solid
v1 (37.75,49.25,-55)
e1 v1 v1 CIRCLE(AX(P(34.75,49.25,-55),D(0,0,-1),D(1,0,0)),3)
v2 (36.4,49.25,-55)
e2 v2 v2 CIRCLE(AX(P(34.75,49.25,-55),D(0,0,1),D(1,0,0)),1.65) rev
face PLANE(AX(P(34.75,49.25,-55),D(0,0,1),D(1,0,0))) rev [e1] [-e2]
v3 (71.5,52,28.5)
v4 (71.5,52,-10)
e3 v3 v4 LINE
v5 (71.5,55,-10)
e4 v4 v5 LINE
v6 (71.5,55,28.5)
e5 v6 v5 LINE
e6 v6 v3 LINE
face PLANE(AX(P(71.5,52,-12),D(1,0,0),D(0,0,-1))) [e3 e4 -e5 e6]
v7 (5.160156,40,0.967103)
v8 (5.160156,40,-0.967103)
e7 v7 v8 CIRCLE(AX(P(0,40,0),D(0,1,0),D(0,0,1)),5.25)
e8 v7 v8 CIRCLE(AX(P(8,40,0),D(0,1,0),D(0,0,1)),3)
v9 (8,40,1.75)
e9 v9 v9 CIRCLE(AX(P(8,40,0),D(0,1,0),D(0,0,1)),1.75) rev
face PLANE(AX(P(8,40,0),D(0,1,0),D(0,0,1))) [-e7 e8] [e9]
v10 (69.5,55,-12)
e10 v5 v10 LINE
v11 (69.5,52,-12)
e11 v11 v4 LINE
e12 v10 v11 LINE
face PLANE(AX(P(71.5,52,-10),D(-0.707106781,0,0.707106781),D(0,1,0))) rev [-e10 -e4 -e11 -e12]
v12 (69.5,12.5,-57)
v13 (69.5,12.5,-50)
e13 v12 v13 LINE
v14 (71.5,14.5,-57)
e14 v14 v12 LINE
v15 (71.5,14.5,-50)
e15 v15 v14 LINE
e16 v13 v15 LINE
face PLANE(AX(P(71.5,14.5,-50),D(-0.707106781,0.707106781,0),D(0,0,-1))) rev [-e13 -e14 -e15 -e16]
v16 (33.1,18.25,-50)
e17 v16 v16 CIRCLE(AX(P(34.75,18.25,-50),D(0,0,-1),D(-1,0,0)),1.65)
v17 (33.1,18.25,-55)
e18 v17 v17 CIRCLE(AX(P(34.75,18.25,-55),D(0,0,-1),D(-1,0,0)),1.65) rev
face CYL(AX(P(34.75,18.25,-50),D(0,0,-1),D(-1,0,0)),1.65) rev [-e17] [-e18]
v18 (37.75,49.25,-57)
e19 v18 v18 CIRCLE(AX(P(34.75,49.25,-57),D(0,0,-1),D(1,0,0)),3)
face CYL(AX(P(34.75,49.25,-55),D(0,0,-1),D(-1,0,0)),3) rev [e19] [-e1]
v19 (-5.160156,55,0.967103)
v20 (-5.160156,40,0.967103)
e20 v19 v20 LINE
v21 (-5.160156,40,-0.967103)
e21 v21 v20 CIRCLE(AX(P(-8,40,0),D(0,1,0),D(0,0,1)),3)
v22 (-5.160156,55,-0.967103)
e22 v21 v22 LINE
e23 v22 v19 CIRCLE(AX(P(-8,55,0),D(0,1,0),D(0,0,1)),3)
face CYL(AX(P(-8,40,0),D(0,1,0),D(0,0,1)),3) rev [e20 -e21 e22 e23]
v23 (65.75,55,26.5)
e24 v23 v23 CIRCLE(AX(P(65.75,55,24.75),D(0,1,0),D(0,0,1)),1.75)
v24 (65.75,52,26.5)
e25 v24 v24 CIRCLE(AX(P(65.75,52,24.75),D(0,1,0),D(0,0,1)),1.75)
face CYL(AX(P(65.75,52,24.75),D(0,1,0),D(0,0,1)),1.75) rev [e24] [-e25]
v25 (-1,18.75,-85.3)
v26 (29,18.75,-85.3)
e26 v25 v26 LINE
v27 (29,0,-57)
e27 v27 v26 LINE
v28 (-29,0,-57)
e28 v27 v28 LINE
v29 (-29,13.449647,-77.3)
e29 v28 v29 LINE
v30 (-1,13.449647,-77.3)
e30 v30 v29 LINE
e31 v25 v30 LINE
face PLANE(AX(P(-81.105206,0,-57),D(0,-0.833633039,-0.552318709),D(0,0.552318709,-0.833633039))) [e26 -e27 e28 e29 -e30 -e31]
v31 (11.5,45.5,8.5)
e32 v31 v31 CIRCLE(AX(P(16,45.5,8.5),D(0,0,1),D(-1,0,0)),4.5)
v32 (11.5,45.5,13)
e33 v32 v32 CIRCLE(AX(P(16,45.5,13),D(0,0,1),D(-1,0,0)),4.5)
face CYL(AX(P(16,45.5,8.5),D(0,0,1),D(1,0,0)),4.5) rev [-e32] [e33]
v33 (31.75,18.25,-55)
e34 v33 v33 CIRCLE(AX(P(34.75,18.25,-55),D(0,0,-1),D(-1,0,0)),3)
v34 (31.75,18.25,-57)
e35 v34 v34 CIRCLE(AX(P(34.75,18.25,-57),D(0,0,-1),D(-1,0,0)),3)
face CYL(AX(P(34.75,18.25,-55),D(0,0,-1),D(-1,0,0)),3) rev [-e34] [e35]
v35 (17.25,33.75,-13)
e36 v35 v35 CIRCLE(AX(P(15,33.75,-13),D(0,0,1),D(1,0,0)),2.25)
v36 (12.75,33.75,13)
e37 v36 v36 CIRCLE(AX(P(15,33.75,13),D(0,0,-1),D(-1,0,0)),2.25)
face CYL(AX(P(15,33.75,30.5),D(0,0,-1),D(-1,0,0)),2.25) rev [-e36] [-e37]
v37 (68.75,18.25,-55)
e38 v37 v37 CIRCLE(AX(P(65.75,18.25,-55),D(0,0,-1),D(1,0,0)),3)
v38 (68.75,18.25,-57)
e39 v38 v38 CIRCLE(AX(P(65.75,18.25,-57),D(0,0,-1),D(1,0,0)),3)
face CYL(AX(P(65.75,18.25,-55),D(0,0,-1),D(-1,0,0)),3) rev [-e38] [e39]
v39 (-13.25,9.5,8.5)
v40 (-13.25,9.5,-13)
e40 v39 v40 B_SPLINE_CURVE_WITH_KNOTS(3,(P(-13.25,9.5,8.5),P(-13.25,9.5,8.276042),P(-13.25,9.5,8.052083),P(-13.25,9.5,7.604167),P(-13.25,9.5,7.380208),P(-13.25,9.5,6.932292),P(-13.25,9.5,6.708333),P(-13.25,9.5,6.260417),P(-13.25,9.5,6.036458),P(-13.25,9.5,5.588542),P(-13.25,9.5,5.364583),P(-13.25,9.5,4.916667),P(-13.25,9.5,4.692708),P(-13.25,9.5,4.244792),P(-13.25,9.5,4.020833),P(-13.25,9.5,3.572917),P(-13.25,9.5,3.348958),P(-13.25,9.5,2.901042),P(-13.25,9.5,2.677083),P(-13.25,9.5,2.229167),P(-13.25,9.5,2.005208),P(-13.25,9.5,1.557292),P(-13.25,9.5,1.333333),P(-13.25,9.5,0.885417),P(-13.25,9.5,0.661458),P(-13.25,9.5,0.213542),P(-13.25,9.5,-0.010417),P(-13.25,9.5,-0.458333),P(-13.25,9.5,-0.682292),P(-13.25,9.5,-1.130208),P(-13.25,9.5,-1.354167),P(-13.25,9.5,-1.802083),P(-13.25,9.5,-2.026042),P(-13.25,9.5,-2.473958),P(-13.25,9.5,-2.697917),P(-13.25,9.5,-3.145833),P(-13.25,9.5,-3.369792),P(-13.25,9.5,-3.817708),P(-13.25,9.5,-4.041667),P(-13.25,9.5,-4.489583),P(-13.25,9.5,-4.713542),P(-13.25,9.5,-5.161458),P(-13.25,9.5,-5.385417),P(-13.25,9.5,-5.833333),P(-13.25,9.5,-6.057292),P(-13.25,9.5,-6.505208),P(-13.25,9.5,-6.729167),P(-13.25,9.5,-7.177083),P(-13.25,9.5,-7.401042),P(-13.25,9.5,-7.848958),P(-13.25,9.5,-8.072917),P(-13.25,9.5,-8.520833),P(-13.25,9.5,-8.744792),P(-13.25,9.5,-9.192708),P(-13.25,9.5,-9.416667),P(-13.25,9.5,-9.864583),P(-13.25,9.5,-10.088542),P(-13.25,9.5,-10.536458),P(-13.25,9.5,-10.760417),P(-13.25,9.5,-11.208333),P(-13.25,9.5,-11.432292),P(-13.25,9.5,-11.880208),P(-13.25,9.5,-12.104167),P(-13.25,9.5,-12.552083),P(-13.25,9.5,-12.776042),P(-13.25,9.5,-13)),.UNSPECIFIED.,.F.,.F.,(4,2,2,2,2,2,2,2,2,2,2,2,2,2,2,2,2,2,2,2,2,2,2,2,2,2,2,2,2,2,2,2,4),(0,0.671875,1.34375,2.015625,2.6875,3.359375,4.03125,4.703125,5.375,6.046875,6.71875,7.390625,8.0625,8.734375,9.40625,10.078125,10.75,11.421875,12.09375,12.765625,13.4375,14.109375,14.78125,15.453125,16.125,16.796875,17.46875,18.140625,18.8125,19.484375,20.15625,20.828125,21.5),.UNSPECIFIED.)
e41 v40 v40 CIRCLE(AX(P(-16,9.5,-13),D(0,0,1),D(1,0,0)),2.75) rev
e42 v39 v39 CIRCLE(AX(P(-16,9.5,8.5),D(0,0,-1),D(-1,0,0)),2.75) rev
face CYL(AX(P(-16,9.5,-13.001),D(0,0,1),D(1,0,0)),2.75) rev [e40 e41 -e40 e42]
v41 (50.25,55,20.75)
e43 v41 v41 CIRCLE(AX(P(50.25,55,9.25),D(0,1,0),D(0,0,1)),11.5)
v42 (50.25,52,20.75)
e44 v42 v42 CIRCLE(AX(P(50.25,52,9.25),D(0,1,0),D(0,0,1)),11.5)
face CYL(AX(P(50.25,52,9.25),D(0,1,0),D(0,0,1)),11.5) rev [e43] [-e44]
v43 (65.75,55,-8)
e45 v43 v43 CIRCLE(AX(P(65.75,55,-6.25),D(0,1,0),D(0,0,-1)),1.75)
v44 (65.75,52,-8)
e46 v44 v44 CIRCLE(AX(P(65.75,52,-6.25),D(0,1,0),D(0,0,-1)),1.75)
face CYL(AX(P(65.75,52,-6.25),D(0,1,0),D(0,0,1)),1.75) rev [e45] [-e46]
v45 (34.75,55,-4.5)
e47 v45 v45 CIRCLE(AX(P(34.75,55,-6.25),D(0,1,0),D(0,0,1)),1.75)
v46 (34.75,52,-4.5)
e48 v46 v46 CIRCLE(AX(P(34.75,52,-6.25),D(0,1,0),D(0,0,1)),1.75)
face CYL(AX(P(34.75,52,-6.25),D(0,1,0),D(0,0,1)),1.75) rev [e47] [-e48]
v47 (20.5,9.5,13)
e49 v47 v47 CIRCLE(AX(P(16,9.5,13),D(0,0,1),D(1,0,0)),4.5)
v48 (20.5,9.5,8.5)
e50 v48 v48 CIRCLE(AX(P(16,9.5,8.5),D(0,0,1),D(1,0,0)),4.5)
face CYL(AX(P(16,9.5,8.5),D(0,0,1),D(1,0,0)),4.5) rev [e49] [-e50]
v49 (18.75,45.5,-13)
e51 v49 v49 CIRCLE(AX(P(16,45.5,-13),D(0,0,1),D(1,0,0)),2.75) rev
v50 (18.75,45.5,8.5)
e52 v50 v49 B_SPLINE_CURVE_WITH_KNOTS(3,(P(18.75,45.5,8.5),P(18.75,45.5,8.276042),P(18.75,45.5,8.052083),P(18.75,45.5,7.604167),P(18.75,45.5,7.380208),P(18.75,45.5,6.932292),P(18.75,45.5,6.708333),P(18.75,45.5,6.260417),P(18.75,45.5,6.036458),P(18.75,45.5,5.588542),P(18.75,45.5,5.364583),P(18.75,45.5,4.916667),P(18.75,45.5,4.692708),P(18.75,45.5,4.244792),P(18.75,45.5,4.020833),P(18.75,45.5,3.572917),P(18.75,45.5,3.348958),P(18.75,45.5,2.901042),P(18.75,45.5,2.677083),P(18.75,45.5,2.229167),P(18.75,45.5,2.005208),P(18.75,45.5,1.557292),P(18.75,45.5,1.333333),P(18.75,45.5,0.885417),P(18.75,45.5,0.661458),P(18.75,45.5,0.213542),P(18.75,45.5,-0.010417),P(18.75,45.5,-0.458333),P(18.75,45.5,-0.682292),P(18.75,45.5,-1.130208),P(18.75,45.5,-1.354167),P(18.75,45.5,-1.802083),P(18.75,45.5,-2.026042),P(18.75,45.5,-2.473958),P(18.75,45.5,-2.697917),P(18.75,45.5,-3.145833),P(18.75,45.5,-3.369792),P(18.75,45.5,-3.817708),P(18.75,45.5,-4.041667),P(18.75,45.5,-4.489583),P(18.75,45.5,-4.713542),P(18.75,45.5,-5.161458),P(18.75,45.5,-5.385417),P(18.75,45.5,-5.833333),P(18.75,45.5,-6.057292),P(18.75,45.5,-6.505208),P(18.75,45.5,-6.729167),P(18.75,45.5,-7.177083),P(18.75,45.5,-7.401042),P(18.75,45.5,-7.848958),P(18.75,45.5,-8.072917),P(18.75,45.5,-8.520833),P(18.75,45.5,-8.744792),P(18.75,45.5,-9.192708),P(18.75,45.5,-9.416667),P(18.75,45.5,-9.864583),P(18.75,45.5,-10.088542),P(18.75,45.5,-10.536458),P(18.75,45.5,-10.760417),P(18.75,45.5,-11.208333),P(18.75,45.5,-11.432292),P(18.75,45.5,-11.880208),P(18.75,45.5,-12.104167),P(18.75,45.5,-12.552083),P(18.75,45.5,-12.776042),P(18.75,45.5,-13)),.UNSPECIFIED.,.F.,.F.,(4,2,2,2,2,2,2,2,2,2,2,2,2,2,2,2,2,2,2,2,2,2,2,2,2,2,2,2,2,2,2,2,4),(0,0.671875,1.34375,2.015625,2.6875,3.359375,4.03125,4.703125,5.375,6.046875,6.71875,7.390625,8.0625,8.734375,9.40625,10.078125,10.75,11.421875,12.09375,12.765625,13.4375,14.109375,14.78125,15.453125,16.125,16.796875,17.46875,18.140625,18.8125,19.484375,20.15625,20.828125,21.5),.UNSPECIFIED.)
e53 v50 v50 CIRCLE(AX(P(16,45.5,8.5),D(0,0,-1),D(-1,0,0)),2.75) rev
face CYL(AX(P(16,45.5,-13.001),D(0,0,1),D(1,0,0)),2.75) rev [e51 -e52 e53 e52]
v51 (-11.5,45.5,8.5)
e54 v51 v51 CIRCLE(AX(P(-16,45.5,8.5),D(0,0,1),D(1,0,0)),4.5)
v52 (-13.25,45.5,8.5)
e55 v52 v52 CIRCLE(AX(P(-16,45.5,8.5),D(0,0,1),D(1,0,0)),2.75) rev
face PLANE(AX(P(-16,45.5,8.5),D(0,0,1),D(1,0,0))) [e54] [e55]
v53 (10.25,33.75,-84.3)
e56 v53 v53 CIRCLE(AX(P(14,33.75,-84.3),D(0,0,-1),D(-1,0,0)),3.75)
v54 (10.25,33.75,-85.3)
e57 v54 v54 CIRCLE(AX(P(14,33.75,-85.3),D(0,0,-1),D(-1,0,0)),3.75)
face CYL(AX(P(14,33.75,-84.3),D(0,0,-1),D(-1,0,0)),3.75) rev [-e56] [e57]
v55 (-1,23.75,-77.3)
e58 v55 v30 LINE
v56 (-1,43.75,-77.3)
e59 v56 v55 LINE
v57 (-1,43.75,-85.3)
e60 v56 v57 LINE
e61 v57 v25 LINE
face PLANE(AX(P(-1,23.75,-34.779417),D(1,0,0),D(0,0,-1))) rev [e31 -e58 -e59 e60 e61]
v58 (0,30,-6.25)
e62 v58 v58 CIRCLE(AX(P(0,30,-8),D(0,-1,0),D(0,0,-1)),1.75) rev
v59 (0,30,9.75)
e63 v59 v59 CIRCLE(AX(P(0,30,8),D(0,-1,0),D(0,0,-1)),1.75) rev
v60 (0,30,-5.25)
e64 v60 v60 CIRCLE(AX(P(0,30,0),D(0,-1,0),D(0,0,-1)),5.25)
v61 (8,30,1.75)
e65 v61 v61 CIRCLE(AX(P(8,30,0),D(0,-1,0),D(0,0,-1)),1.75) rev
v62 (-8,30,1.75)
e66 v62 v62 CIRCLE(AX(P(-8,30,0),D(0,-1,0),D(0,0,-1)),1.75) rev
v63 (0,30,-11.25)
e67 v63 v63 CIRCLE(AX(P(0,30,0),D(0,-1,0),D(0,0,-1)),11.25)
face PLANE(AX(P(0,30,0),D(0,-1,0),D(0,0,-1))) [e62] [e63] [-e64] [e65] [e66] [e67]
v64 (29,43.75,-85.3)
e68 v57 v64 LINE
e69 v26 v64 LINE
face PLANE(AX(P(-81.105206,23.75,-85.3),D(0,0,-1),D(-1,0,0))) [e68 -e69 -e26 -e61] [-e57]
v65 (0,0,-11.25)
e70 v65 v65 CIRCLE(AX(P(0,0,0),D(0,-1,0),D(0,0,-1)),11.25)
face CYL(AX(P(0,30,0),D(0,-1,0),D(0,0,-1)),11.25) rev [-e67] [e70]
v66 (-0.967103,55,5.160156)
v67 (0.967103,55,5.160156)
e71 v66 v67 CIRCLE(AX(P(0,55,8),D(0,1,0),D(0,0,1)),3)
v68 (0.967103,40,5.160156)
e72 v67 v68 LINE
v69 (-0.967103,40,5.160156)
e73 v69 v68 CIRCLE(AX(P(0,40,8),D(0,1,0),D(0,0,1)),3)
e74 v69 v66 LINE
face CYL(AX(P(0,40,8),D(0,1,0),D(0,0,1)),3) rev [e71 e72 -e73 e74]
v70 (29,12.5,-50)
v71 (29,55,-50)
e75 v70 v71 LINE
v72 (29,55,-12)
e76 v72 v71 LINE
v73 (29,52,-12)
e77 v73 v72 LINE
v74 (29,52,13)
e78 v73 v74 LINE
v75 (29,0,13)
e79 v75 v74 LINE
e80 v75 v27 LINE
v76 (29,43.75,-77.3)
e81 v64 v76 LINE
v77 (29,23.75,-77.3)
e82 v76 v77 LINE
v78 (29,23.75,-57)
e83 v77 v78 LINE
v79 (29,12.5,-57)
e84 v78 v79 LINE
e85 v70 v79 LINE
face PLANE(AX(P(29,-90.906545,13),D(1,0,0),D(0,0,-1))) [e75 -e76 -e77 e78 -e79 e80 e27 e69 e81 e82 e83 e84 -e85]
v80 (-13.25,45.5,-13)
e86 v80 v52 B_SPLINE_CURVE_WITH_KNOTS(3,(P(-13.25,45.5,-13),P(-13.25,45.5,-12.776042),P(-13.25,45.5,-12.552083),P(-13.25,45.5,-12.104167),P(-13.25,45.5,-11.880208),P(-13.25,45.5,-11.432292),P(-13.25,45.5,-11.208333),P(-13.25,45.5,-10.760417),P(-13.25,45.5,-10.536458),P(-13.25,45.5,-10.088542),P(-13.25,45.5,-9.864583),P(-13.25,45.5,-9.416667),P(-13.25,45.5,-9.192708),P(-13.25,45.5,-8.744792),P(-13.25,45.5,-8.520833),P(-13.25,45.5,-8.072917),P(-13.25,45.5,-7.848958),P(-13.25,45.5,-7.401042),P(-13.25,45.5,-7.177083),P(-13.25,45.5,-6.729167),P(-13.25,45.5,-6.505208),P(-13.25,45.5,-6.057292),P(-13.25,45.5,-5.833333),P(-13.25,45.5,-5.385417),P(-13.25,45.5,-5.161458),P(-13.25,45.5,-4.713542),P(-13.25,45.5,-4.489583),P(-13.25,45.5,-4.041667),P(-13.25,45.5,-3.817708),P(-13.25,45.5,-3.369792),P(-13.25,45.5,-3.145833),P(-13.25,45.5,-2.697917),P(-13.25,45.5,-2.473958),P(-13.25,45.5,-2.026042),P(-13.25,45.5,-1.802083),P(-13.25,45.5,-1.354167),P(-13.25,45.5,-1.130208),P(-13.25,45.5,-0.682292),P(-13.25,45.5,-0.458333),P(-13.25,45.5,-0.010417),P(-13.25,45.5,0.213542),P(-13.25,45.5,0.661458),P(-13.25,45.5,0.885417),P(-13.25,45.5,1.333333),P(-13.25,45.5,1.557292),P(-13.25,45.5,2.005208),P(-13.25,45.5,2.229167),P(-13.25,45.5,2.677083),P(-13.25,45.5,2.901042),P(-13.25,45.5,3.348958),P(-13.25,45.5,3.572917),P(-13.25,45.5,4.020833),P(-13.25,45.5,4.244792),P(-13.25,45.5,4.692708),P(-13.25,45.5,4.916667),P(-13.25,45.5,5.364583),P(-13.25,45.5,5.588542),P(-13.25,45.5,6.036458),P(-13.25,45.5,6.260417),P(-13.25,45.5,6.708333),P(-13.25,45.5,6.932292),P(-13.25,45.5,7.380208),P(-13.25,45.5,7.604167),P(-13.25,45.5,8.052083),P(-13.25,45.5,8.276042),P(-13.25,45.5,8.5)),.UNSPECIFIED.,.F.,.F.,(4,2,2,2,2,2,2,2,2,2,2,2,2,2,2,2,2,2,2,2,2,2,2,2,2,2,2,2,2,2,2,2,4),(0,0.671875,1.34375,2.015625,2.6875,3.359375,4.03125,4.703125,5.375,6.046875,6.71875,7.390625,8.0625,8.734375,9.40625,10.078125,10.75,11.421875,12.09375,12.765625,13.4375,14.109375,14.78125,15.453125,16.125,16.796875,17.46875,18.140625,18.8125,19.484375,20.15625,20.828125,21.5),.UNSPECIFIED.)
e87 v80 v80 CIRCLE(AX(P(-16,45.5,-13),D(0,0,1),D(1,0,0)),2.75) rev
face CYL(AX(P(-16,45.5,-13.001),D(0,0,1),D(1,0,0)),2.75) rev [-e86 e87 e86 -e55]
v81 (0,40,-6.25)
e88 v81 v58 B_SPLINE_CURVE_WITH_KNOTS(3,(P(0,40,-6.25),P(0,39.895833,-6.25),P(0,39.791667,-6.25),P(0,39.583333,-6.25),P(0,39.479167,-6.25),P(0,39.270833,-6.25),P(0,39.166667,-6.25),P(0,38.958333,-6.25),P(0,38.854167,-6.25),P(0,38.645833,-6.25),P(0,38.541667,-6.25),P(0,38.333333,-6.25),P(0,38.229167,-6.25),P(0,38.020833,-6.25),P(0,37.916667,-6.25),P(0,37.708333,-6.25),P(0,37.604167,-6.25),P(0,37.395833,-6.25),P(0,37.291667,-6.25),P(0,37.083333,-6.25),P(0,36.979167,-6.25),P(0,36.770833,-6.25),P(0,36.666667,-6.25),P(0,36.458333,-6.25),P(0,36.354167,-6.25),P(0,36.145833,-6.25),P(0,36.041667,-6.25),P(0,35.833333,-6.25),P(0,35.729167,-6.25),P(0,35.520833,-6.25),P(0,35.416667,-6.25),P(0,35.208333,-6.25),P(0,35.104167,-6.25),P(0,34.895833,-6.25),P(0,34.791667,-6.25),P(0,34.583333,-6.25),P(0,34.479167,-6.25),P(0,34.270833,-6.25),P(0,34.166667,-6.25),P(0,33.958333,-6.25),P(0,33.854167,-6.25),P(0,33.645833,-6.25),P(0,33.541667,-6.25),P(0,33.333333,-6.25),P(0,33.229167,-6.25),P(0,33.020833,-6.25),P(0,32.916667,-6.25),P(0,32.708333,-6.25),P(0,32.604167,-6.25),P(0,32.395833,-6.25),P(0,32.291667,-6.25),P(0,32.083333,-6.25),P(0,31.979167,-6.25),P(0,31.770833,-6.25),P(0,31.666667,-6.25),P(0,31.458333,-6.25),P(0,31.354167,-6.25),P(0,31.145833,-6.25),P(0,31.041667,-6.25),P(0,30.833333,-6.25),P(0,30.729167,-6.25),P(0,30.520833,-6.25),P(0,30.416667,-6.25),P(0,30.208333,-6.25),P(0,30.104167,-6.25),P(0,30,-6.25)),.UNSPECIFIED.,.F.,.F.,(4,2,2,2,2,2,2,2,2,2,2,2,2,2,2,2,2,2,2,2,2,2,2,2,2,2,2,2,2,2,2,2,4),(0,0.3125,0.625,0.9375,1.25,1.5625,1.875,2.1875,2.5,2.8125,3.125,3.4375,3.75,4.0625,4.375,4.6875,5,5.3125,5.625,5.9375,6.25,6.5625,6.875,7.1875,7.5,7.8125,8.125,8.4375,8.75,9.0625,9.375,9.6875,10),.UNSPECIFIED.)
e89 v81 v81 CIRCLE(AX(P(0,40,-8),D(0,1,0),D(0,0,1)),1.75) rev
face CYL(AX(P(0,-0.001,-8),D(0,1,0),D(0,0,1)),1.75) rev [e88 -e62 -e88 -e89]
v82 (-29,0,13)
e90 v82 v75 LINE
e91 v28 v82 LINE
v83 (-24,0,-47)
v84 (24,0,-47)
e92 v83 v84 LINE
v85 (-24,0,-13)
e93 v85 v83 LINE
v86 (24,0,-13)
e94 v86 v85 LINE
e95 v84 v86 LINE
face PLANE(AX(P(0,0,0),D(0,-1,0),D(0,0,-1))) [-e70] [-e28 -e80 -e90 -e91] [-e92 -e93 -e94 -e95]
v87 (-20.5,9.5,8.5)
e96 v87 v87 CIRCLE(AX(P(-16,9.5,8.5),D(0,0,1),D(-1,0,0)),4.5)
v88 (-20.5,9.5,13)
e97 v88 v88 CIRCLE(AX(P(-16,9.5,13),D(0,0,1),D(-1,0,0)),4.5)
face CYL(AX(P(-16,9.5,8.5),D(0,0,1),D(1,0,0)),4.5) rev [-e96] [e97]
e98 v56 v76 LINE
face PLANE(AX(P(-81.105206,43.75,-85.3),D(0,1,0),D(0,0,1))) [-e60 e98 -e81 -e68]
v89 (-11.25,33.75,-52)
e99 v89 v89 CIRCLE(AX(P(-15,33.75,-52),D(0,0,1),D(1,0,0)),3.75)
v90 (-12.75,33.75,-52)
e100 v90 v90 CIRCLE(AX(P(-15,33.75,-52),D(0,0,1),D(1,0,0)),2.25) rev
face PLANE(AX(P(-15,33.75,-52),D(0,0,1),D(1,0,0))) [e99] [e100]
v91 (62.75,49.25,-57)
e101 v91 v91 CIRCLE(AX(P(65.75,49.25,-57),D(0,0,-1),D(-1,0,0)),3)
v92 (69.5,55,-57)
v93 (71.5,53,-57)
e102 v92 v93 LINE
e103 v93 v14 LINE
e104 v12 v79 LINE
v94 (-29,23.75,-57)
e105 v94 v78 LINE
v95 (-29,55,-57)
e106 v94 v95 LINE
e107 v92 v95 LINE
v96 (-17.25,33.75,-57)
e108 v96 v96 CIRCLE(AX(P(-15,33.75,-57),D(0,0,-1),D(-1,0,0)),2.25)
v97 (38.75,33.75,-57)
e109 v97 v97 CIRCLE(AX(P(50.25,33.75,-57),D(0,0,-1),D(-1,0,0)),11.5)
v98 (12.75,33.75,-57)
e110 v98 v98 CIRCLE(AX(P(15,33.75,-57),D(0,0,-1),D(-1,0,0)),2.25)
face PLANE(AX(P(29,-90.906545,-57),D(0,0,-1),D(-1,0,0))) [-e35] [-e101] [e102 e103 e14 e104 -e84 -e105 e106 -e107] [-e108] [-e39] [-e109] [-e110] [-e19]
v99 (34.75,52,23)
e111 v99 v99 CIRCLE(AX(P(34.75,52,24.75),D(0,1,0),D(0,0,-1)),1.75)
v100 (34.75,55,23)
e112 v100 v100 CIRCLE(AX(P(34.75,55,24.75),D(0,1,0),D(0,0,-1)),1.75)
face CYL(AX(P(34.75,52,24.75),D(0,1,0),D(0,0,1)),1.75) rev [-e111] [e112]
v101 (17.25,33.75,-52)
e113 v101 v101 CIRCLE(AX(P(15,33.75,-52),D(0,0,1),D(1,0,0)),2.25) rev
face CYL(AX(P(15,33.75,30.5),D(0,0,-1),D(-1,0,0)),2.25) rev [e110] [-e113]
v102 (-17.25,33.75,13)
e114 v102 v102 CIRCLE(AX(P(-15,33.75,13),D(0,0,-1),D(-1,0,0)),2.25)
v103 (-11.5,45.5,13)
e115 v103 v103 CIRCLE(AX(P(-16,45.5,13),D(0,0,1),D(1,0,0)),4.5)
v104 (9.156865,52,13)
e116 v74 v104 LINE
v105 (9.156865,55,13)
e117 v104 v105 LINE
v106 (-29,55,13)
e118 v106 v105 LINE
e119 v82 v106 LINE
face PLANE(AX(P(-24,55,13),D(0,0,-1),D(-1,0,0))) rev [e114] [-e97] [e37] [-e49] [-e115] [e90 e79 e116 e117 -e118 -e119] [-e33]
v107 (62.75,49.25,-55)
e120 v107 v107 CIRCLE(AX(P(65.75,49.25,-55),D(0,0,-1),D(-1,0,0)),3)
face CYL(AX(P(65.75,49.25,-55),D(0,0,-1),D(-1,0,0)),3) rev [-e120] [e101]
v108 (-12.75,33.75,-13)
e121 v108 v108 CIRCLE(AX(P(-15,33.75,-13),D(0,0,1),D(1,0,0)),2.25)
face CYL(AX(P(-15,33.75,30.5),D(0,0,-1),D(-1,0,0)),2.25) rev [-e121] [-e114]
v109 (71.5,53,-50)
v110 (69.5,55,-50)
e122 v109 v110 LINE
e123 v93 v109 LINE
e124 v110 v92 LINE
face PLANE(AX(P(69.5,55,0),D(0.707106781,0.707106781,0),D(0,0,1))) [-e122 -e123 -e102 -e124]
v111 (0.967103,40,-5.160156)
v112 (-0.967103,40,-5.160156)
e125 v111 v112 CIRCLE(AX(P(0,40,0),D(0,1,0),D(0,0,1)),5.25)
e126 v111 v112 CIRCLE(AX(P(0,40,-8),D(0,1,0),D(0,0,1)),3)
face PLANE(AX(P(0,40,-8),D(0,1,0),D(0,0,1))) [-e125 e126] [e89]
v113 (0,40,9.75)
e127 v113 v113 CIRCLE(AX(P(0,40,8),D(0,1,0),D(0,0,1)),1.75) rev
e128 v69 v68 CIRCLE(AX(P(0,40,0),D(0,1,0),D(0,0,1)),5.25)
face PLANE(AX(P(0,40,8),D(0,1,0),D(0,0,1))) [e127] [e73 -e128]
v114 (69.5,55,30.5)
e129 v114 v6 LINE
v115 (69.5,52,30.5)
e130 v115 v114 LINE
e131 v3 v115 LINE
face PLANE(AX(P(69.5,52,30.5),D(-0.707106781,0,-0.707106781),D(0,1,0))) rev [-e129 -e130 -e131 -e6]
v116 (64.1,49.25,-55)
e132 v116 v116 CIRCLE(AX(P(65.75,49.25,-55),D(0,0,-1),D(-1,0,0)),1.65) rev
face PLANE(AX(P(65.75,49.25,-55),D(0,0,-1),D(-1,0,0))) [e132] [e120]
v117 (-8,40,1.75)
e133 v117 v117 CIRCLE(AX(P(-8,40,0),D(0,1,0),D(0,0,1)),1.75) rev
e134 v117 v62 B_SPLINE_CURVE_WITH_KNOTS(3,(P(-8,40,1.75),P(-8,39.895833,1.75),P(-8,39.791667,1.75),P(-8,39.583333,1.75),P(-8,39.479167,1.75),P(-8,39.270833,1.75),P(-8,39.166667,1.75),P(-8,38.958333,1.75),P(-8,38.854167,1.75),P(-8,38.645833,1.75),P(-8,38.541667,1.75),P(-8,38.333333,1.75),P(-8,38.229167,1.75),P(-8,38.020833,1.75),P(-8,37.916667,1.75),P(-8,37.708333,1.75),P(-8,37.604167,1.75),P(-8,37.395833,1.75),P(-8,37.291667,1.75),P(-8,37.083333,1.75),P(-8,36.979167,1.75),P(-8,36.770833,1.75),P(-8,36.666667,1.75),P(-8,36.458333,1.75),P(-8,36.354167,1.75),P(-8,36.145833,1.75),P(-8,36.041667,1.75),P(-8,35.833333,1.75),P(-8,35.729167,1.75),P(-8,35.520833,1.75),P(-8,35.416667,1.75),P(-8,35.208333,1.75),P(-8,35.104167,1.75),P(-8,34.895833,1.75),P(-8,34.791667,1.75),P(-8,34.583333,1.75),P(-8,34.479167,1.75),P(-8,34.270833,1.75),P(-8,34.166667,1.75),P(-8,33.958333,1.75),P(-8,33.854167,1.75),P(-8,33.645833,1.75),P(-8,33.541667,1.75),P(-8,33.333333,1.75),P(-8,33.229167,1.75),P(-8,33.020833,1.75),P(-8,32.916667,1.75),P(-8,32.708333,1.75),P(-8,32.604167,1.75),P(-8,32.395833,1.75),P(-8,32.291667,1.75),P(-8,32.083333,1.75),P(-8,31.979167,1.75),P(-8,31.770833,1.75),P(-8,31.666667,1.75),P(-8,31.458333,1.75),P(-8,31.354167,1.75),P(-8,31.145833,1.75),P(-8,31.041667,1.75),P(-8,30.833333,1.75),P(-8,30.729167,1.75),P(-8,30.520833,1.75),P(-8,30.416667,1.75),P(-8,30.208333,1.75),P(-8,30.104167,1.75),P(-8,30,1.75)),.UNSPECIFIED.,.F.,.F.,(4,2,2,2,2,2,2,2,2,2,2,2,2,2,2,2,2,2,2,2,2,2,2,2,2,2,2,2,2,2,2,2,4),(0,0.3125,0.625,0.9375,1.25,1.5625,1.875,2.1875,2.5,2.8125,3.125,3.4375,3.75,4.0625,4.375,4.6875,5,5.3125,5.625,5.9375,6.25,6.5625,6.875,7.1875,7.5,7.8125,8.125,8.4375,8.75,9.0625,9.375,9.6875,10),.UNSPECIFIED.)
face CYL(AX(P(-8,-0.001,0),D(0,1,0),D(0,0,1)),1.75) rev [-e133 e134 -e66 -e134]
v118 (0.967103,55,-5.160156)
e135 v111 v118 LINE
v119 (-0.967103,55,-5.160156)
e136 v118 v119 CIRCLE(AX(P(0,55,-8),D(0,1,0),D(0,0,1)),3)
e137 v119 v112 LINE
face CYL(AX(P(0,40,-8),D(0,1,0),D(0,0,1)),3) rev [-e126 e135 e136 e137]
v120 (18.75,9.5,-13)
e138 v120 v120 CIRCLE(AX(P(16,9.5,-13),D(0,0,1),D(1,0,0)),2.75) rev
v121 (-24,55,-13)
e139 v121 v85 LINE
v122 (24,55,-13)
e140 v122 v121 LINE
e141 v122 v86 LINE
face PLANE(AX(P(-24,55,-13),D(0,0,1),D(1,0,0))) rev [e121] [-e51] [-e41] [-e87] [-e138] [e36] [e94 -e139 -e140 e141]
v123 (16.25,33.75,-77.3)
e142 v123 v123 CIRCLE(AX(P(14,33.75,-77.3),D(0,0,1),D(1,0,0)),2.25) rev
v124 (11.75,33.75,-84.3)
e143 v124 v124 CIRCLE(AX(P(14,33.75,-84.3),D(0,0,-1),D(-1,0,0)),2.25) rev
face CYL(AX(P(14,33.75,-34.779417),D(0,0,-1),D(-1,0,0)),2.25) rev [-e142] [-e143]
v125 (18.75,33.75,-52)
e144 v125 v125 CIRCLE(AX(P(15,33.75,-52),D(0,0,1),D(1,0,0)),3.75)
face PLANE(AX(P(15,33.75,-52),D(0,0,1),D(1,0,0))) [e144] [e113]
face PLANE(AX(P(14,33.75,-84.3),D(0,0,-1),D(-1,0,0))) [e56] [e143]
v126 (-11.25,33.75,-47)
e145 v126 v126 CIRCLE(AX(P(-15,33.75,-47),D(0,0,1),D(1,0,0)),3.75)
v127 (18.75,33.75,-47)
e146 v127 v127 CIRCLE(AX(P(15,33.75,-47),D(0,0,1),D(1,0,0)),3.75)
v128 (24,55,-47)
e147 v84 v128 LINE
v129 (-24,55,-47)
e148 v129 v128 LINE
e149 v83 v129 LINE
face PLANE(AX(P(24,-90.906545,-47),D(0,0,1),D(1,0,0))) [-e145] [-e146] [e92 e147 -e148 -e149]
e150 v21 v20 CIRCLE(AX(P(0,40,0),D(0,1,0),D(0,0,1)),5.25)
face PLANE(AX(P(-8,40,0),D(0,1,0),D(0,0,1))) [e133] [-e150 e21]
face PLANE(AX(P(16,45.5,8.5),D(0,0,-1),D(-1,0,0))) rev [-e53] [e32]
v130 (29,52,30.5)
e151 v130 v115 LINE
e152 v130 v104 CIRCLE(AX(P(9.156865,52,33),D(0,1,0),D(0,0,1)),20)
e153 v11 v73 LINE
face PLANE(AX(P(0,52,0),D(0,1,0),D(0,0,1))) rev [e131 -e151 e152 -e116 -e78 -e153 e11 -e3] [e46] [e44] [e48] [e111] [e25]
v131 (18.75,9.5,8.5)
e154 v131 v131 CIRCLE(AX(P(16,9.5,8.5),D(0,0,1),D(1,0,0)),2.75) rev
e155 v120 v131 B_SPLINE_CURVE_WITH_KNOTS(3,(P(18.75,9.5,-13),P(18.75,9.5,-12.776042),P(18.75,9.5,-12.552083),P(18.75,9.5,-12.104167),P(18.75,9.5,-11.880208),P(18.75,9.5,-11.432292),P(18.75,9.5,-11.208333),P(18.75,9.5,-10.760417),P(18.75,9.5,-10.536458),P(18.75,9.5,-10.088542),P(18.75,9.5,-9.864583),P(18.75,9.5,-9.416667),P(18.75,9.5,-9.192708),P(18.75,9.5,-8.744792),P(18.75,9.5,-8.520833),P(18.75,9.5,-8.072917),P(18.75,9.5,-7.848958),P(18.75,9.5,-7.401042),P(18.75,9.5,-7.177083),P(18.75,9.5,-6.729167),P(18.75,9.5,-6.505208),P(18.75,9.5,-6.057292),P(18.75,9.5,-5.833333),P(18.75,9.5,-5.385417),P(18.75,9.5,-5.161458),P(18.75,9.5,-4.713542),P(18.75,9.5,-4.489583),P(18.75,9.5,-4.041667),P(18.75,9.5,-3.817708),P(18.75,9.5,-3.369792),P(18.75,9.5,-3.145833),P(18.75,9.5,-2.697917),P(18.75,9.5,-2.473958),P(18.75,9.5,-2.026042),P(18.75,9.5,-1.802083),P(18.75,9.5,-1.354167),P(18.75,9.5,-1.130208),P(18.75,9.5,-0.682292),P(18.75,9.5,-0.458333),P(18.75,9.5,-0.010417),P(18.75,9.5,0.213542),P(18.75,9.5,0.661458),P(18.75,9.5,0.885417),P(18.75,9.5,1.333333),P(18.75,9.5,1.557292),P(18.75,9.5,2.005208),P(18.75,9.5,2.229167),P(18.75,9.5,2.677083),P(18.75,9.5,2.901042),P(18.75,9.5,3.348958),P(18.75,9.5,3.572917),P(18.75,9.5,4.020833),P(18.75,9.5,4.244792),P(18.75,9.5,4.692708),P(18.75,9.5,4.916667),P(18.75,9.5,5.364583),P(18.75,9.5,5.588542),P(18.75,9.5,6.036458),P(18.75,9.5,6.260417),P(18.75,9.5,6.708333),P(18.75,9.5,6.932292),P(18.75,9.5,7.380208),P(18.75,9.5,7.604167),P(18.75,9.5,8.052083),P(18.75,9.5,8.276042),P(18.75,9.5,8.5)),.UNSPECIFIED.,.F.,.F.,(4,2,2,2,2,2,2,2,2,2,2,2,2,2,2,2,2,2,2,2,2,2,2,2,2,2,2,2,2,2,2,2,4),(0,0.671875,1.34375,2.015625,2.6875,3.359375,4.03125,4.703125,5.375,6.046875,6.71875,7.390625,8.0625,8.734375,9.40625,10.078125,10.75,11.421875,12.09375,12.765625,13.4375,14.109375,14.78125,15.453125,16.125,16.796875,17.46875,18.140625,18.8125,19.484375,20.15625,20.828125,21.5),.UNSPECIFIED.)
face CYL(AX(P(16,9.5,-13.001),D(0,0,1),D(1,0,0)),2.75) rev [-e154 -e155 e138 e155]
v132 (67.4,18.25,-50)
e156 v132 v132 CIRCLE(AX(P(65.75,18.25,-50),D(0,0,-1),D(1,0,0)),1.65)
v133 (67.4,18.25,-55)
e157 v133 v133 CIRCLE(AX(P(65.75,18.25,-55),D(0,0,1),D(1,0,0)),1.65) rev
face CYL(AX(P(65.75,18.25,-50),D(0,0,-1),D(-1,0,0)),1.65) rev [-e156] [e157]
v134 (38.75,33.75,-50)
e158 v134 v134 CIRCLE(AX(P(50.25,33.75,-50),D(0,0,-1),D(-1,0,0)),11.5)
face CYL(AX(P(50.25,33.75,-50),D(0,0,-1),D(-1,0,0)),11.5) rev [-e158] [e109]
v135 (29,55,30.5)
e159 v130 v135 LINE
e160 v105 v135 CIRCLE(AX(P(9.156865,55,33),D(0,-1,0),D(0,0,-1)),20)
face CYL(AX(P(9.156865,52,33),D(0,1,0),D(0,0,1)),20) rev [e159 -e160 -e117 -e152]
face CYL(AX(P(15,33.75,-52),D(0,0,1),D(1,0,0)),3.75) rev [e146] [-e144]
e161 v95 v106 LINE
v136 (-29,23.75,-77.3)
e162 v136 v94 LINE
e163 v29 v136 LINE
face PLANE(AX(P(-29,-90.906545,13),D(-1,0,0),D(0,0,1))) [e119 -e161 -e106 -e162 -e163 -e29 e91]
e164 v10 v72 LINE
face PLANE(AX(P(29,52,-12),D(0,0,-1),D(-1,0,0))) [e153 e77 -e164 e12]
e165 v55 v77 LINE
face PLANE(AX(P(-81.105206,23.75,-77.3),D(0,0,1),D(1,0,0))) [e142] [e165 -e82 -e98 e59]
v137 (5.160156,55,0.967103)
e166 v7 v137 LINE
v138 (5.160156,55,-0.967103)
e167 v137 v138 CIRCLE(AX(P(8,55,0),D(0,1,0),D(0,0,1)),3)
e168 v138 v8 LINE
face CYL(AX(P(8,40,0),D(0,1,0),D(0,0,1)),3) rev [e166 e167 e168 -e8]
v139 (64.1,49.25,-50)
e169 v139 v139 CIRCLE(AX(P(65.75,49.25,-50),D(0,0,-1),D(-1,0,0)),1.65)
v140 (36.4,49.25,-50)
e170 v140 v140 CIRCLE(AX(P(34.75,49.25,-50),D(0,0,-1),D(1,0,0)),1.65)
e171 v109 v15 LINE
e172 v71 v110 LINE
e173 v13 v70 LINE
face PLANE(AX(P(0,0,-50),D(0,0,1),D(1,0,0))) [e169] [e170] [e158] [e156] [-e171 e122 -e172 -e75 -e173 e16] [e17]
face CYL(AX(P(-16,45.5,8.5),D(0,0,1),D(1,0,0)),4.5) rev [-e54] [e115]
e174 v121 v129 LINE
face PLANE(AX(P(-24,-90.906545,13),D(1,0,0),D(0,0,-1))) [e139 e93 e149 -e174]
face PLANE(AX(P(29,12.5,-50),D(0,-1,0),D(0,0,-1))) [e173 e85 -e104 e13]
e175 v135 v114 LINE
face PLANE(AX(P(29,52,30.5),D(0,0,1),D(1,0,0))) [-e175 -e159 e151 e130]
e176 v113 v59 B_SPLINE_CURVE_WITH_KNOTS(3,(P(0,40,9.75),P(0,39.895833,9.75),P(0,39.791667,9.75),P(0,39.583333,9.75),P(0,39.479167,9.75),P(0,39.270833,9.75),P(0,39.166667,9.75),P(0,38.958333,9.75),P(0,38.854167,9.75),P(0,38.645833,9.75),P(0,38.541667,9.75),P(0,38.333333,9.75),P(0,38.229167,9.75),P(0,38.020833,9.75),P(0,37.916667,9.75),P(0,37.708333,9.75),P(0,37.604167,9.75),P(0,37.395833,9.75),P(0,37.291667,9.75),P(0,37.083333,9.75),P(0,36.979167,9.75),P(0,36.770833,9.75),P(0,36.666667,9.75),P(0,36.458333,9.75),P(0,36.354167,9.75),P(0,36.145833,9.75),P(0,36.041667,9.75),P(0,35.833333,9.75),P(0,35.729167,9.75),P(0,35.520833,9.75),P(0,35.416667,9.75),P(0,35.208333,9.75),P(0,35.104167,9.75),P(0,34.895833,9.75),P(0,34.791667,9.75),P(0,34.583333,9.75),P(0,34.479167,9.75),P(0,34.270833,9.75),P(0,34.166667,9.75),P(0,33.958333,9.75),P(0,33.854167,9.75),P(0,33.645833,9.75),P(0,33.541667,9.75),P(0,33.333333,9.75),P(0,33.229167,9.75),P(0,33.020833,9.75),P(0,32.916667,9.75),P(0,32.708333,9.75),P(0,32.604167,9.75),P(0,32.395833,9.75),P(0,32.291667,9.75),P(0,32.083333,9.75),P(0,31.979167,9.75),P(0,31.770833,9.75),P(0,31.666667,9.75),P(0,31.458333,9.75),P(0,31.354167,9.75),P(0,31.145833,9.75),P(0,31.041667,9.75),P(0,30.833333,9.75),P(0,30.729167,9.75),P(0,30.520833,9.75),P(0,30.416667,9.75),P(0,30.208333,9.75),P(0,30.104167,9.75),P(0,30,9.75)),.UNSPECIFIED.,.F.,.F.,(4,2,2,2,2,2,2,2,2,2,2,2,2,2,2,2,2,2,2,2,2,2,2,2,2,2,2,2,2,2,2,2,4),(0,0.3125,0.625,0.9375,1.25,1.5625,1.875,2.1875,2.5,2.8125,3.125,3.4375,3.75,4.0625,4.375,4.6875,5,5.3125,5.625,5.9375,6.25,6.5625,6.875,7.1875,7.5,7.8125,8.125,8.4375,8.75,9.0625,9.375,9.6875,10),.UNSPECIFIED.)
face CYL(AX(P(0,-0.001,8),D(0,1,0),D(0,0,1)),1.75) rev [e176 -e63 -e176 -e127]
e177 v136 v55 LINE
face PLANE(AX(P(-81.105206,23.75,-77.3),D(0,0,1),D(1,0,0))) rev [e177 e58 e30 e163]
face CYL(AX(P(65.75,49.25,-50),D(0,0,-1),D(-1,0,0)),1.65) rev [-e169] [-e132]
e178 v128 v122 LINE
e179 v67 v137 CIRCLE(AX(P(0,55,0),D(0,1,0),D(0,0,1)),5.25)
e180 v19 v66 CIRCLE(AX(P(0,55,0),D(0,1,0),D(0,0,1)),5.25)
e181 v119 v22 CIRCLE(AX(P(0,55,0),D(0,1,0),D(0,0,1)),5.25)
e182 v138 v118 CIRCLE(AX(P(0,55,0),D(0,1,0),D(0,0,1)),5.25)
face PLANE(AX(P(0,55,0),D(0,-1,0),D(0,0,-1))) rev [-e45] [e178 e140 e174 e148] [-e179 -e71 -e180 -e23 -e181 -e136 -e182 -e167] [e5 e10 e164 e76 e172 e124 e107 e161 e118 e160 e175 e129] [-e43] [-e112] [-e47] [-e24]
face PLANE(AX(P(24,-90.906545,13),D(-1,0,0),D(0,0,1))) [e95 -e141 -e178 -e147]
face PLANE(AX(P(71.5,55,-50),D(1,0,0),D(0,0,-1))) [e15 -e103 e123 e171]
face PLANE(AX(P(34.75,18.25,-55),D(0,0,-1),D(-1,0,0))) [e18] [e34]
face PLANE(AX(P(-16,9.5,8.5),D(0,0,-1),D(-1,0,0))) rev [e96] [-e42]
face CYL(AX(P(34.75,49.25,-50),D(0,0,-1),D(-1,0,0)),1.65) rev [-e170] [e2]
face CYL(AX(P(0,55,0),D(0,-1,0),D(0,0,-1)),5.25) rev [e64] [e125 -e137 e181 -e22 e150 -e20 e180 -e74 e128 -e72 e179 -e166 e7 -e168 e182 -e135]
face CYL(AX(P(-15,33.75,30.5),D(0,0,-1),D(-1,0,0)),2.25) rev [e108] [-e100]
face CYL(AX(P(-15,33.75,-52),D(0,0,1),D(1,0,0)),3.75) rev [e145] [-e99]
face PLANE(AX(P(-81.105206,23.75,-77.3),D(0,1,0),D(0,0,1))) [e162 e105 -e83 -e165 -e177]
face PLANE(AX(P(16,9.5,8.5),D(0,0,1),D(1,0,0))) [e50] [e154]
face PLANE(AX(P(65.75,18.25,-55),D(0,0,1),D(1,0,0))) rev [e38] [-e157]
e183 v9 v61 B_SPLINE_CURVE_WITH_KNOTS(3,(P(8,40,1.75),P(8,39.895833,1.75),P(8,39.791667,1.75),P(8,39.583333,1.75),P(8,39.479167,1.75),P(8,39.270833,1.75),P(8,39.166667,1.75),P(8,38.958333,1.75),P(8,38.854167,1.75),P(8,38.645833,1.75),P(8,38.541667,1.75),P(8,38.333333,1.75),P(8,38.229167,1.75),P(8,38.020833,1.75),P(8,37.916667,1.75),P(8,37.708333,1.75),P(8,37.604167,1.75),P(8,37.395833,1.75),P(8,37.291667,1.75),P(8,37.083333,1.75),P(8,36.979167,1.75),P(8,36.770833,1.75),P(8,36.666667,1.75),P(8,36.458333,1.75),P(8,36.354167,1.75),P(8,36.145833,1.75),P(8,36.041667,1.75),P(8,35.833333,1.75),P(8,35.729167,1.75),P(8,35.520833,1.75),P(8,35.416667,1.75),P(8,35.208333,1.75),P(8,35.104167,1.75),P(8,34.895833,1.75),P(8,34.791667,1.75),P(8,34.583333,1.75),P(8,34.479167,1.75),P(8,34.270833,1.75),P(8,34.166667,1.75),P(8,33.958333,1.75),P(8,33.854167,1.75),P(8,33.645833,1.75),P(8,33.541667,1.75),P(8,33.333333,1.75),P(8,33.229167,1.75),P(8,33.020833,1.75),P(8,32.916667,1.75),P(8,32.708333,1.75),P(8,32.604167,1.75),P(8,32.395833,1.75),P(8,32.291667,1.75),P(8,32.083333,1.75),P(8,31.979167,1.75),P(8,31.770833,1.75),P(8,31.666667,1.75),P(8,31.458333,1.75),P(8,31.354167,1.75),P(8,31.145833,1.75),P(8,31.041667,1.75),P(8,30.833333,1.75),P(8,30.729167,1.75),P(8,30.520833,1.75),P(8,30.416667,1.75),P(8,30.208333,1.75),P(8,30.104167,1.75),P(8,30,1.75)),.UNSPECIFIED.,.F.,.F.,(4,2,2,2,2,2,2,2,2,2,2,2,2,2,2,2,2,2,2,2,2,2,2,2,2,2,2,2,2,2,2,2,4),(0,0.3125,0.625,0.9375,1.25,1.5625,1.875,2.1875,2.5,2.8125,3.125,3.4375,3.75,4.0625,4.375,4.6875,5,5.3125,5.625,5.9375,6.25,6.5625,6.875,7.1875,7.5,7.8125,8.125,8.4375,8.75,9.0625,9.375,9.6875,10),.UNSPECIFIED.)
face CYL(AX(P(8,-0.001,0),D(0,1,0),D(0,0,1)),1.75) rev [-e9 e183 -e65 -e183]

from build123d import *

# Parameters (mm, degrees)
SKETCH1_W           = 48
SKETCH1_H           = 26
SKETCH1_R           = 5.25
BOSS_EXTRUDE1_DEPTH = 55
CUT_EXTRUDE1_REACH  = 67.399
SKETCH2_R           = 2.75
SKETCH3_R           = 4.5
CUT_EXTRUDE2_DEPTH  = 4.5
CUT_EXTRUDE3_REACH  = 63.4
SKETCH4_R           = 1.75
SKETCH5_R           = 3
CUT_EXTRUDE4_DEPTH  = 15
SKETCH6_R           = 11.25
CUT_EXTRUDE5_DEPTH  = 30
BOSS_EXTRUDE3_DEPTH = 55
SKETCH10_W          = 42.5
SKETCH10_H          = 42.5
SKETCH10_R          = 1.65
SKETCH10_R_2        = 11.5
BOSS_EXTRUDE4_DEPTH = 7
CHAMFER1_SIZE       = 2
SKETCH11_W          = 42.5
SKETCH11_H          = 42.5
SKETCH11_R          = 11.5
SKETCH11_R_2        = 1.75
BOSS_EXTRUDE5_DEPTH = 3
FILLET2_R           = 20
CHAMFER2_SIZE       = 2
BOSS_EXTRUDE6_DEPTH = 58
SKETCH13_R          = 2.25
CUT_EXTRUDE6_DEPTH  = 126.672192628
SKETCH14_R          = 3.75
CUT_EXTRUDE7_DEPTH  = 5
SKETCH15_R          = 2.25
CUT_EXTRUDE8_DEPTH  = 8
SKETCH16_R          = 3.75
CUT_EXTRUDE9_DEPTH  = 1
SKETCH17_R          = 3
CUT_EXTRUDE10_DEPTH = 2


with BuildPart() as part:
    # Sketch1 → Boss-Extrude1 (new body)
    with BuildSketch(Plane(origin=(0, 0, 0), x_dir=(1, 0, 0), z_dir=(0, 1, 0))):
        Rectangle(SKETCH1_W, SKETCH1_H)
        with Locations(Location((0, 0, 0), (0, 0, 270))):
            Circle(SKETCH1_R, mode=Mode.SUBTRACT)
    extrude(amount=BOSS_EXTRUDE1_DEPTH)

    # Sketch2 → Cut-Extrude1 (cut, up to next)
    with BuildSketch(Plane.XY.offset(13), mode=Mode.PRIVATE) as cut_extrude1_sk1:
        with Locations((-16, 45.5)):
            Circle(SKETCH2_R)
    cut_extrude1_tool1 = extrude(cut_extrude1_sk1.sketch, amount=-CUT_EXTRUDE1_REACH, mode=Mode.PRIVATE) & part.part
    # Sketch2 → Cut-Extrude1 (cut, up to next)
    with BuildSketch(Plane.XY.offset(13), mode=Mode.PRIVATE) as cut_extrude1_sk2:
        with Locations((16, 45.5)):
            Circle(SKETCH2_R)
    cut_extrude1_tool2 = extrude(cut_extrude1_sk2.sketch, amount=-CUT_EXTRUDE1_REACH, mode=Mode.PRIVATE) & part.part
    # Sketch2 → Cut-Extrude1 (cut, up to next)
    with BuildSketch(Plane.XY.offset(13), mode=Mode.PRIVATE) as cut_extrude1_sk3:
        with Locations((16, 9.5)):
            Circle(SKETCH2_R)
    cut_extrude1_tool3 = extrude(cut_extrude1_sk3.sketch, amount=-CUT_EXTRUDE1_REACH, mode=Mode.PRIVATE) & part.part
    # Sketch2 → Cut-Extrude1 (cut, up to next)
    with BuildSketch(Plane.XY.offset(13), mode=Mode.PRIVATE) as cut_extrude1_sk4:
        with Locations((-16, 9.5)):
            Circle(SKETCH2_R)
    cut_extrude1_tool4 = extrude(cut_extrude1_sk4.sketch, amount=-CUT_EXTRUDE1_REACH, mode=Mode.PRIVATE) & part.part
    add(cut_extrude1_tool1.solids().sort_by_distance((-16, 45.5, 13))[0], mode=Mode.SUBTRACT)
    add(cut_extrude1_tool2.solids().sort_by_distance((16, 45.5, 13))[0], mode=Mode.SUBTRACT)
    add(cut_extrude1_tool3.solids().sort_by_distance((16, 9.5, 13))[0], mode=Mode.SUBTRACT)
    add(cut_extrude1_tool4.solids().sort_by_distance((-16, 9.5, 13))[0], mode=Mode.SUBTRACT)

    # Sketch3 → Cut-Extrude2 (cut)
    with BuildSketch(Plane.XY.offset(13)):
        with Locations((-16, 45.5)):
            Circle(SKETCH3_R)
        with Locations(Location((16, 45.5, 0), (0, 0, 180))):
            Circle(SKETCH3_R)
        with Locations((16, 9.5)):
            Circle(SKETCH3_R)
        with Locations(Location((-16, 9.5, 0), (0, 0, 180))):
            Circle(SKETCH3_R)
    extrude(amount=-CUT_EXTRUDE2_DEPTH, mode=Mode.SUBTRACT)

    # Sketch4 → Cut-Extrude3 (cut, up to next)
    with BuildSketch(Plane(origin=(0, 55, 0), x_dir=(1, 0, 0), z_dir=(0, 1, 0)), mode=Mode.PRIVATE) as cut_extrude3_sk1:
        with Locations(Location((0, 8, 0), (0, 0, 270))):
            Circle(SKETCH4_R)
    cut_extrude3_tool1 = extrude(cut_extrude3_sk1.sketch, amount=-CUT_EXTRUDE3_REACH, mode=Mode.PRIVATE) & part.part
    # Sketch4 → Cut-Extrude3 (cut, up to next)
    with BuildSketch(Plane(origin=(0, 55, 0), x_dir=(1, 0, 0), z_dir=(0, 1, 0)), mode=Mode.PRIVATE) as cut_extrude3_sk2:
        with Locations(Location((8, 0, 0), (0, 0, 270))):
            Circle(SKETCH4_R)
    cut_extrude3_tool2 = extrude(cut_extrude3_sk2.sketch, amount=-CUT_EXTRUDE3_REACH, mode=Mode.PRIVATE) & part.part
    # Sketch4 → Cut-Extrude3 (cut, up to next)
    with BuildSketch(Plane(origin=(0, 55, 0), x_dir=(1, 0, 0), z_dir=(0, 1, 0)), mode=Mode.PRIVATE) as cut_extrude3_sk3:
        with Locations(Location((0, -8, 0), (0, 0, 270))):
            Circle(SKETCH4_R)
    cut_extrude3_tool3 = extrude(cut_extrude3_sk3.sketch, amount=-CUT_EXTRUDE3_REACH, mode=Mode.PRIVATE) & part.part
    # Sketch4 → Cut-Extrude3 (cut, up to next)
    with BuildSketch(Plane(origin=(0, 55, 0), x_dir=(1, 0, 0), z_dir=(0, 1, 0)), mode=Mode.PRIVATE) as cut_extrude3_sk4:
        with Locations(Location((-8, 0, 0), (0, 0, 270))):
            Circle(SKETCH4_R)
    cut_extrude3_tool4 = extrude(cut_extrude3_sk4.sketch, amount=-CUT_EXTRUDE3_REACH, mode=Mode.PRIVATE) & part.part
    add(cut_extrude3_tool1.solids().sort_by_distance((0, 55, -8))[0], mode=Mode.SUBTRACT)
    add(cut_extrude3_tool2.solids().sort_by_distance((8, 55, 0))[0], mode=Mode.SUBTRACT)
    add(cut_extrude3_tool3.solids().sort_by_distance((0, 55, 8))[0], mode=Mode.SUBTRACT)
    add(cut_extrude3_tool4.solids().sort_by_distance((-8, 55, 0))[0], mode=Mode.SUBTRACT)

    # Sketch5 → Cut-Extrude4 (cut)
    with BuildSketch(Plane(origin=(0, 55, 0), x_dir=(1, 0, 0), z_dir=(0, 1, 0))):
        with Locations((0, 8)):
            Circle(SKETCH5_R)
        with Locations((8, 0)):
            Circle(SKETCH5_R)
        with Locations((0, -8)):
            Circle(SKETCH5_R)
        with Locations((-8, 0)):
            Circle(SKETCH5_R)
    extrude(amount=-CUT_EXTRUDE4_DEPTH, mode=Mode.SUBTRACT)

    # Sketch6 → Cut-Extrude5 (cut)
    with BuildSketch(Plane.XZ):
        with Locations(Location((0, 0, 0), (0, 0, 270))):
            Circle(SKETCH6_R)
    extrude(amount=-CUT_EXTRUDE5_DEPTH, mode=Mode.SUBTRACT)

    # Sketch9 → Boss-Extrude3 (add)
    with BuildSketch(Plane(origin=(0, 55, 0), x_dir=(1, 0, 0), z_dir=(0, 1, 0))):
        Polygon((-24, -13), (-29, -13), (-29, 57), (29, 57), (29, -13), (24, -13), (24, 47), (-24, 47), align=None)
    extrude(amount=-BOSS_EXTRUDE3_DEPTH)

    # Sketch10 → Boss-Extrude4 (add)
    with BuildSketch(Plane(origin=(0, 0, -57), x_dir=(-1, 0, 0), z_dir=(0, 0, -1))):
        with Locations((-50.25, 33.75)):
            Rectangle(SKETCH10_W, SKETCH10_H)
        with Locations((-65.75, 49.25)):
            Circle(SKETCH10_R, mode=Mode.SUBTRACT)
        with Locations(Location((-34.75, 49.25, 0), (0, 0, 180))):
            Circle(SKETCH10_R, mode=Mode.SUBTRACT)
        with Locations((-34.75, 18.25)):
            Circle(SKETCH10_R, mode=Mode.SUBTRACT)
        with Locations(Location((-65.75, 18.25, 0), (0, 0, 180))):
            Circle(SKETCH10_R, mode=Mode.SUBTRACT)
        with Locations((-50.25, 33.75)):
            Circle(SKETCH10_R_2, mode=Mode.SUBTRACT)
    extrude(amount=-BOSS_EXTRUDE4_DEPTH)

    # Chamfer1
    chamfer1_edges = [part.edges().sort_by_distance(p)[0] for p in [
        (71.5, 12.5, -53.5),
        (71.5, 55, -53.5),
    ]]
    chamfer(chamfer1_edges, length=CHAMFER1_SIZE)

    # Sketch11 → Boss-Extrude5 (add)
    with BuildSketch(Plane(origin=(0, 55, 0), x_dir=(1, 0, 0), z_dir=(0, 1, 0))):
        with Locations((50.25, -9.25)):
            Rectangle(SKETCH11_W, SKETCH11_H)
        with Locations(Location((50.25, -9.25, 0), (0, 0, 270))):
            Circle(SKETCH11_R, mode=Mode.SUBTRACT)
        with Locations(Location((34.75, 6.25, 0), (0, 0, 270))):
            Circle(SKETCH11_R_2, mode=Mode.SUBTRACT)
        with Locations(Location((65.75, 6.25, 0), (0, 0, 90))):
            Circle(SKETCH11_R_2, mode=Mode.SUBTRACT)
        with Locations(Location((65.75, -24.75, 0), (0, 0, 270))):
            Circle(SKETCH11_R_2, mode=Mode.SUBTRACT)
        with Locations(Location((34.75, -24.75, 0), (0, 0, 90))):
            Circle(SKETCH11_R_2, mode=Mode.SUBTRACT)
    extrude(amount=-BOSS_EXTRUDE5_DEPTH)

    # Fillet2
    # the kernel refuses this fillet: 20 mm, written as the material it adds along each edge
    with BuildSketch(Plane(origin=(29, 55, 13), x_dir=(-1, 0, 0), z_dir=(0, -1, 0))) as fillet2_piece_1:
        with BuildLine():
            CenterArc((19.843134833, -20), FILLET2_R, 90, 82.819244219)
            Line((0, -17.5), (0, 0))
            Line((0, 0), (19.843134833, 0))
        make_face()
    extrude(amount=3)

    # Chamfer2
    chamfer2_edges = [part.edges().sort_by_distance(p)[0] for p in [
        (71.5, 53.5, -12),
        (71.5, 53.5, 30.5),
    ]]
    chamfer(chamfer2_edges, length=CHAMFER2_SIZE)

    # Sketch12 → Boss-Extrude6 (add)
    with BuildSketch(Plane(origin=(29, 0, 0), x_dir=(0, 0, -1), z_dir=(1, 0, 0))):
        Polygon((57, 0), (85.3, 18.75), (85.3, 23.75), (85.3, 43.75), (77.3, 43.75), (77.3, 23.75), (57, 23.75), align=None)
    extrude(amount=-BOSS_EXTRUDE6_DEPTH)

    # Sketch13 → Cut-Extrude6 (cut, through all)
    with BuildSketch(Plane(origin=(0, 0, -57), x_dir=(-1, 0, 0), z_dir=(0, 0, -1))):
        with Locations((15, 33.75)):
            Circle(SKETCH13_R)
        with Locations((-15, 33.75)):
            Circle(SKETCH13_R)
    extrude(amount=-CUT_EXTRUDE6_DEPTH, mode=Mode.SUBTRACT)

    # Sketch14 → Cut-Extrude7 (cut)
    with BuildSketch(Plane.XY.offset(-47)):
        with Locations((-15, 33.75)):
            Circle(SKETCH14_R)
        with Locations((15, 33.75)):
            Circle(SKETCH14_R)
    extrude(amount=-CUT_EXTRUDE7_DEPTH, mode=Mode.SUBTRACT)

    # Sketch15 → Cut-Extrude8 (cut)
    with BuildSketch(Plane(origin=(0, 0, -85.3), x_dir=(-1, 0, 0), z_dir=(0, 0, -1))):
        with Locations((-14, 33.75)):
            Circle(SKETCH15_R)
        Polygon((29, 43.75), (1, 43.75), (1, 23.75), (1, 11.75), (29, 11.75), (29, 23.75), align=None)
    extrude(amount=-CUT_EXTRUDE8_DEPTH, mode=Mode.SUBTRACT)

    # Sketch16 → Cut-Extrude9 (cut)
    with BuildSketch(Plane(origin=(0, 0, -85.3), x_dir=(-1, 0, 0), z_dir=(0, 0, -1))):
        with Locations((-14, 33.75)):
            Circle(SKETCH16_R)
    extrude(amount=-CUT_EXTRUDE9_DEPTH, mode=Mode.SUBTRACT)

    # Sketch17 → Cut-Extrude10 (cut)
    with BuildSketch(Plane(origin=(0, 0, -57), x_dir=(-1, 0, 0), z_dir=(0, 0, -1))):
        with Locations((-65.75, 49.25)):
            Circle(SKETCH17_R)
        with Locations(Location((-34.75, 49.25, 0), (0, 0, 180))):
            Circle(SKETCH17_R)
        with Locations((-34.75, 18.25)):
            Circle(SKETCH17_R)
        with Locations(Location((-65.75, 18.25, 0), (0, 0, 180))):
            Circle(SKETCH17_R)
    extrude(amount=-CUT_EXTRUDE10_DEPTH, mode=Mode.SUBTRACT)


solid = part.part
